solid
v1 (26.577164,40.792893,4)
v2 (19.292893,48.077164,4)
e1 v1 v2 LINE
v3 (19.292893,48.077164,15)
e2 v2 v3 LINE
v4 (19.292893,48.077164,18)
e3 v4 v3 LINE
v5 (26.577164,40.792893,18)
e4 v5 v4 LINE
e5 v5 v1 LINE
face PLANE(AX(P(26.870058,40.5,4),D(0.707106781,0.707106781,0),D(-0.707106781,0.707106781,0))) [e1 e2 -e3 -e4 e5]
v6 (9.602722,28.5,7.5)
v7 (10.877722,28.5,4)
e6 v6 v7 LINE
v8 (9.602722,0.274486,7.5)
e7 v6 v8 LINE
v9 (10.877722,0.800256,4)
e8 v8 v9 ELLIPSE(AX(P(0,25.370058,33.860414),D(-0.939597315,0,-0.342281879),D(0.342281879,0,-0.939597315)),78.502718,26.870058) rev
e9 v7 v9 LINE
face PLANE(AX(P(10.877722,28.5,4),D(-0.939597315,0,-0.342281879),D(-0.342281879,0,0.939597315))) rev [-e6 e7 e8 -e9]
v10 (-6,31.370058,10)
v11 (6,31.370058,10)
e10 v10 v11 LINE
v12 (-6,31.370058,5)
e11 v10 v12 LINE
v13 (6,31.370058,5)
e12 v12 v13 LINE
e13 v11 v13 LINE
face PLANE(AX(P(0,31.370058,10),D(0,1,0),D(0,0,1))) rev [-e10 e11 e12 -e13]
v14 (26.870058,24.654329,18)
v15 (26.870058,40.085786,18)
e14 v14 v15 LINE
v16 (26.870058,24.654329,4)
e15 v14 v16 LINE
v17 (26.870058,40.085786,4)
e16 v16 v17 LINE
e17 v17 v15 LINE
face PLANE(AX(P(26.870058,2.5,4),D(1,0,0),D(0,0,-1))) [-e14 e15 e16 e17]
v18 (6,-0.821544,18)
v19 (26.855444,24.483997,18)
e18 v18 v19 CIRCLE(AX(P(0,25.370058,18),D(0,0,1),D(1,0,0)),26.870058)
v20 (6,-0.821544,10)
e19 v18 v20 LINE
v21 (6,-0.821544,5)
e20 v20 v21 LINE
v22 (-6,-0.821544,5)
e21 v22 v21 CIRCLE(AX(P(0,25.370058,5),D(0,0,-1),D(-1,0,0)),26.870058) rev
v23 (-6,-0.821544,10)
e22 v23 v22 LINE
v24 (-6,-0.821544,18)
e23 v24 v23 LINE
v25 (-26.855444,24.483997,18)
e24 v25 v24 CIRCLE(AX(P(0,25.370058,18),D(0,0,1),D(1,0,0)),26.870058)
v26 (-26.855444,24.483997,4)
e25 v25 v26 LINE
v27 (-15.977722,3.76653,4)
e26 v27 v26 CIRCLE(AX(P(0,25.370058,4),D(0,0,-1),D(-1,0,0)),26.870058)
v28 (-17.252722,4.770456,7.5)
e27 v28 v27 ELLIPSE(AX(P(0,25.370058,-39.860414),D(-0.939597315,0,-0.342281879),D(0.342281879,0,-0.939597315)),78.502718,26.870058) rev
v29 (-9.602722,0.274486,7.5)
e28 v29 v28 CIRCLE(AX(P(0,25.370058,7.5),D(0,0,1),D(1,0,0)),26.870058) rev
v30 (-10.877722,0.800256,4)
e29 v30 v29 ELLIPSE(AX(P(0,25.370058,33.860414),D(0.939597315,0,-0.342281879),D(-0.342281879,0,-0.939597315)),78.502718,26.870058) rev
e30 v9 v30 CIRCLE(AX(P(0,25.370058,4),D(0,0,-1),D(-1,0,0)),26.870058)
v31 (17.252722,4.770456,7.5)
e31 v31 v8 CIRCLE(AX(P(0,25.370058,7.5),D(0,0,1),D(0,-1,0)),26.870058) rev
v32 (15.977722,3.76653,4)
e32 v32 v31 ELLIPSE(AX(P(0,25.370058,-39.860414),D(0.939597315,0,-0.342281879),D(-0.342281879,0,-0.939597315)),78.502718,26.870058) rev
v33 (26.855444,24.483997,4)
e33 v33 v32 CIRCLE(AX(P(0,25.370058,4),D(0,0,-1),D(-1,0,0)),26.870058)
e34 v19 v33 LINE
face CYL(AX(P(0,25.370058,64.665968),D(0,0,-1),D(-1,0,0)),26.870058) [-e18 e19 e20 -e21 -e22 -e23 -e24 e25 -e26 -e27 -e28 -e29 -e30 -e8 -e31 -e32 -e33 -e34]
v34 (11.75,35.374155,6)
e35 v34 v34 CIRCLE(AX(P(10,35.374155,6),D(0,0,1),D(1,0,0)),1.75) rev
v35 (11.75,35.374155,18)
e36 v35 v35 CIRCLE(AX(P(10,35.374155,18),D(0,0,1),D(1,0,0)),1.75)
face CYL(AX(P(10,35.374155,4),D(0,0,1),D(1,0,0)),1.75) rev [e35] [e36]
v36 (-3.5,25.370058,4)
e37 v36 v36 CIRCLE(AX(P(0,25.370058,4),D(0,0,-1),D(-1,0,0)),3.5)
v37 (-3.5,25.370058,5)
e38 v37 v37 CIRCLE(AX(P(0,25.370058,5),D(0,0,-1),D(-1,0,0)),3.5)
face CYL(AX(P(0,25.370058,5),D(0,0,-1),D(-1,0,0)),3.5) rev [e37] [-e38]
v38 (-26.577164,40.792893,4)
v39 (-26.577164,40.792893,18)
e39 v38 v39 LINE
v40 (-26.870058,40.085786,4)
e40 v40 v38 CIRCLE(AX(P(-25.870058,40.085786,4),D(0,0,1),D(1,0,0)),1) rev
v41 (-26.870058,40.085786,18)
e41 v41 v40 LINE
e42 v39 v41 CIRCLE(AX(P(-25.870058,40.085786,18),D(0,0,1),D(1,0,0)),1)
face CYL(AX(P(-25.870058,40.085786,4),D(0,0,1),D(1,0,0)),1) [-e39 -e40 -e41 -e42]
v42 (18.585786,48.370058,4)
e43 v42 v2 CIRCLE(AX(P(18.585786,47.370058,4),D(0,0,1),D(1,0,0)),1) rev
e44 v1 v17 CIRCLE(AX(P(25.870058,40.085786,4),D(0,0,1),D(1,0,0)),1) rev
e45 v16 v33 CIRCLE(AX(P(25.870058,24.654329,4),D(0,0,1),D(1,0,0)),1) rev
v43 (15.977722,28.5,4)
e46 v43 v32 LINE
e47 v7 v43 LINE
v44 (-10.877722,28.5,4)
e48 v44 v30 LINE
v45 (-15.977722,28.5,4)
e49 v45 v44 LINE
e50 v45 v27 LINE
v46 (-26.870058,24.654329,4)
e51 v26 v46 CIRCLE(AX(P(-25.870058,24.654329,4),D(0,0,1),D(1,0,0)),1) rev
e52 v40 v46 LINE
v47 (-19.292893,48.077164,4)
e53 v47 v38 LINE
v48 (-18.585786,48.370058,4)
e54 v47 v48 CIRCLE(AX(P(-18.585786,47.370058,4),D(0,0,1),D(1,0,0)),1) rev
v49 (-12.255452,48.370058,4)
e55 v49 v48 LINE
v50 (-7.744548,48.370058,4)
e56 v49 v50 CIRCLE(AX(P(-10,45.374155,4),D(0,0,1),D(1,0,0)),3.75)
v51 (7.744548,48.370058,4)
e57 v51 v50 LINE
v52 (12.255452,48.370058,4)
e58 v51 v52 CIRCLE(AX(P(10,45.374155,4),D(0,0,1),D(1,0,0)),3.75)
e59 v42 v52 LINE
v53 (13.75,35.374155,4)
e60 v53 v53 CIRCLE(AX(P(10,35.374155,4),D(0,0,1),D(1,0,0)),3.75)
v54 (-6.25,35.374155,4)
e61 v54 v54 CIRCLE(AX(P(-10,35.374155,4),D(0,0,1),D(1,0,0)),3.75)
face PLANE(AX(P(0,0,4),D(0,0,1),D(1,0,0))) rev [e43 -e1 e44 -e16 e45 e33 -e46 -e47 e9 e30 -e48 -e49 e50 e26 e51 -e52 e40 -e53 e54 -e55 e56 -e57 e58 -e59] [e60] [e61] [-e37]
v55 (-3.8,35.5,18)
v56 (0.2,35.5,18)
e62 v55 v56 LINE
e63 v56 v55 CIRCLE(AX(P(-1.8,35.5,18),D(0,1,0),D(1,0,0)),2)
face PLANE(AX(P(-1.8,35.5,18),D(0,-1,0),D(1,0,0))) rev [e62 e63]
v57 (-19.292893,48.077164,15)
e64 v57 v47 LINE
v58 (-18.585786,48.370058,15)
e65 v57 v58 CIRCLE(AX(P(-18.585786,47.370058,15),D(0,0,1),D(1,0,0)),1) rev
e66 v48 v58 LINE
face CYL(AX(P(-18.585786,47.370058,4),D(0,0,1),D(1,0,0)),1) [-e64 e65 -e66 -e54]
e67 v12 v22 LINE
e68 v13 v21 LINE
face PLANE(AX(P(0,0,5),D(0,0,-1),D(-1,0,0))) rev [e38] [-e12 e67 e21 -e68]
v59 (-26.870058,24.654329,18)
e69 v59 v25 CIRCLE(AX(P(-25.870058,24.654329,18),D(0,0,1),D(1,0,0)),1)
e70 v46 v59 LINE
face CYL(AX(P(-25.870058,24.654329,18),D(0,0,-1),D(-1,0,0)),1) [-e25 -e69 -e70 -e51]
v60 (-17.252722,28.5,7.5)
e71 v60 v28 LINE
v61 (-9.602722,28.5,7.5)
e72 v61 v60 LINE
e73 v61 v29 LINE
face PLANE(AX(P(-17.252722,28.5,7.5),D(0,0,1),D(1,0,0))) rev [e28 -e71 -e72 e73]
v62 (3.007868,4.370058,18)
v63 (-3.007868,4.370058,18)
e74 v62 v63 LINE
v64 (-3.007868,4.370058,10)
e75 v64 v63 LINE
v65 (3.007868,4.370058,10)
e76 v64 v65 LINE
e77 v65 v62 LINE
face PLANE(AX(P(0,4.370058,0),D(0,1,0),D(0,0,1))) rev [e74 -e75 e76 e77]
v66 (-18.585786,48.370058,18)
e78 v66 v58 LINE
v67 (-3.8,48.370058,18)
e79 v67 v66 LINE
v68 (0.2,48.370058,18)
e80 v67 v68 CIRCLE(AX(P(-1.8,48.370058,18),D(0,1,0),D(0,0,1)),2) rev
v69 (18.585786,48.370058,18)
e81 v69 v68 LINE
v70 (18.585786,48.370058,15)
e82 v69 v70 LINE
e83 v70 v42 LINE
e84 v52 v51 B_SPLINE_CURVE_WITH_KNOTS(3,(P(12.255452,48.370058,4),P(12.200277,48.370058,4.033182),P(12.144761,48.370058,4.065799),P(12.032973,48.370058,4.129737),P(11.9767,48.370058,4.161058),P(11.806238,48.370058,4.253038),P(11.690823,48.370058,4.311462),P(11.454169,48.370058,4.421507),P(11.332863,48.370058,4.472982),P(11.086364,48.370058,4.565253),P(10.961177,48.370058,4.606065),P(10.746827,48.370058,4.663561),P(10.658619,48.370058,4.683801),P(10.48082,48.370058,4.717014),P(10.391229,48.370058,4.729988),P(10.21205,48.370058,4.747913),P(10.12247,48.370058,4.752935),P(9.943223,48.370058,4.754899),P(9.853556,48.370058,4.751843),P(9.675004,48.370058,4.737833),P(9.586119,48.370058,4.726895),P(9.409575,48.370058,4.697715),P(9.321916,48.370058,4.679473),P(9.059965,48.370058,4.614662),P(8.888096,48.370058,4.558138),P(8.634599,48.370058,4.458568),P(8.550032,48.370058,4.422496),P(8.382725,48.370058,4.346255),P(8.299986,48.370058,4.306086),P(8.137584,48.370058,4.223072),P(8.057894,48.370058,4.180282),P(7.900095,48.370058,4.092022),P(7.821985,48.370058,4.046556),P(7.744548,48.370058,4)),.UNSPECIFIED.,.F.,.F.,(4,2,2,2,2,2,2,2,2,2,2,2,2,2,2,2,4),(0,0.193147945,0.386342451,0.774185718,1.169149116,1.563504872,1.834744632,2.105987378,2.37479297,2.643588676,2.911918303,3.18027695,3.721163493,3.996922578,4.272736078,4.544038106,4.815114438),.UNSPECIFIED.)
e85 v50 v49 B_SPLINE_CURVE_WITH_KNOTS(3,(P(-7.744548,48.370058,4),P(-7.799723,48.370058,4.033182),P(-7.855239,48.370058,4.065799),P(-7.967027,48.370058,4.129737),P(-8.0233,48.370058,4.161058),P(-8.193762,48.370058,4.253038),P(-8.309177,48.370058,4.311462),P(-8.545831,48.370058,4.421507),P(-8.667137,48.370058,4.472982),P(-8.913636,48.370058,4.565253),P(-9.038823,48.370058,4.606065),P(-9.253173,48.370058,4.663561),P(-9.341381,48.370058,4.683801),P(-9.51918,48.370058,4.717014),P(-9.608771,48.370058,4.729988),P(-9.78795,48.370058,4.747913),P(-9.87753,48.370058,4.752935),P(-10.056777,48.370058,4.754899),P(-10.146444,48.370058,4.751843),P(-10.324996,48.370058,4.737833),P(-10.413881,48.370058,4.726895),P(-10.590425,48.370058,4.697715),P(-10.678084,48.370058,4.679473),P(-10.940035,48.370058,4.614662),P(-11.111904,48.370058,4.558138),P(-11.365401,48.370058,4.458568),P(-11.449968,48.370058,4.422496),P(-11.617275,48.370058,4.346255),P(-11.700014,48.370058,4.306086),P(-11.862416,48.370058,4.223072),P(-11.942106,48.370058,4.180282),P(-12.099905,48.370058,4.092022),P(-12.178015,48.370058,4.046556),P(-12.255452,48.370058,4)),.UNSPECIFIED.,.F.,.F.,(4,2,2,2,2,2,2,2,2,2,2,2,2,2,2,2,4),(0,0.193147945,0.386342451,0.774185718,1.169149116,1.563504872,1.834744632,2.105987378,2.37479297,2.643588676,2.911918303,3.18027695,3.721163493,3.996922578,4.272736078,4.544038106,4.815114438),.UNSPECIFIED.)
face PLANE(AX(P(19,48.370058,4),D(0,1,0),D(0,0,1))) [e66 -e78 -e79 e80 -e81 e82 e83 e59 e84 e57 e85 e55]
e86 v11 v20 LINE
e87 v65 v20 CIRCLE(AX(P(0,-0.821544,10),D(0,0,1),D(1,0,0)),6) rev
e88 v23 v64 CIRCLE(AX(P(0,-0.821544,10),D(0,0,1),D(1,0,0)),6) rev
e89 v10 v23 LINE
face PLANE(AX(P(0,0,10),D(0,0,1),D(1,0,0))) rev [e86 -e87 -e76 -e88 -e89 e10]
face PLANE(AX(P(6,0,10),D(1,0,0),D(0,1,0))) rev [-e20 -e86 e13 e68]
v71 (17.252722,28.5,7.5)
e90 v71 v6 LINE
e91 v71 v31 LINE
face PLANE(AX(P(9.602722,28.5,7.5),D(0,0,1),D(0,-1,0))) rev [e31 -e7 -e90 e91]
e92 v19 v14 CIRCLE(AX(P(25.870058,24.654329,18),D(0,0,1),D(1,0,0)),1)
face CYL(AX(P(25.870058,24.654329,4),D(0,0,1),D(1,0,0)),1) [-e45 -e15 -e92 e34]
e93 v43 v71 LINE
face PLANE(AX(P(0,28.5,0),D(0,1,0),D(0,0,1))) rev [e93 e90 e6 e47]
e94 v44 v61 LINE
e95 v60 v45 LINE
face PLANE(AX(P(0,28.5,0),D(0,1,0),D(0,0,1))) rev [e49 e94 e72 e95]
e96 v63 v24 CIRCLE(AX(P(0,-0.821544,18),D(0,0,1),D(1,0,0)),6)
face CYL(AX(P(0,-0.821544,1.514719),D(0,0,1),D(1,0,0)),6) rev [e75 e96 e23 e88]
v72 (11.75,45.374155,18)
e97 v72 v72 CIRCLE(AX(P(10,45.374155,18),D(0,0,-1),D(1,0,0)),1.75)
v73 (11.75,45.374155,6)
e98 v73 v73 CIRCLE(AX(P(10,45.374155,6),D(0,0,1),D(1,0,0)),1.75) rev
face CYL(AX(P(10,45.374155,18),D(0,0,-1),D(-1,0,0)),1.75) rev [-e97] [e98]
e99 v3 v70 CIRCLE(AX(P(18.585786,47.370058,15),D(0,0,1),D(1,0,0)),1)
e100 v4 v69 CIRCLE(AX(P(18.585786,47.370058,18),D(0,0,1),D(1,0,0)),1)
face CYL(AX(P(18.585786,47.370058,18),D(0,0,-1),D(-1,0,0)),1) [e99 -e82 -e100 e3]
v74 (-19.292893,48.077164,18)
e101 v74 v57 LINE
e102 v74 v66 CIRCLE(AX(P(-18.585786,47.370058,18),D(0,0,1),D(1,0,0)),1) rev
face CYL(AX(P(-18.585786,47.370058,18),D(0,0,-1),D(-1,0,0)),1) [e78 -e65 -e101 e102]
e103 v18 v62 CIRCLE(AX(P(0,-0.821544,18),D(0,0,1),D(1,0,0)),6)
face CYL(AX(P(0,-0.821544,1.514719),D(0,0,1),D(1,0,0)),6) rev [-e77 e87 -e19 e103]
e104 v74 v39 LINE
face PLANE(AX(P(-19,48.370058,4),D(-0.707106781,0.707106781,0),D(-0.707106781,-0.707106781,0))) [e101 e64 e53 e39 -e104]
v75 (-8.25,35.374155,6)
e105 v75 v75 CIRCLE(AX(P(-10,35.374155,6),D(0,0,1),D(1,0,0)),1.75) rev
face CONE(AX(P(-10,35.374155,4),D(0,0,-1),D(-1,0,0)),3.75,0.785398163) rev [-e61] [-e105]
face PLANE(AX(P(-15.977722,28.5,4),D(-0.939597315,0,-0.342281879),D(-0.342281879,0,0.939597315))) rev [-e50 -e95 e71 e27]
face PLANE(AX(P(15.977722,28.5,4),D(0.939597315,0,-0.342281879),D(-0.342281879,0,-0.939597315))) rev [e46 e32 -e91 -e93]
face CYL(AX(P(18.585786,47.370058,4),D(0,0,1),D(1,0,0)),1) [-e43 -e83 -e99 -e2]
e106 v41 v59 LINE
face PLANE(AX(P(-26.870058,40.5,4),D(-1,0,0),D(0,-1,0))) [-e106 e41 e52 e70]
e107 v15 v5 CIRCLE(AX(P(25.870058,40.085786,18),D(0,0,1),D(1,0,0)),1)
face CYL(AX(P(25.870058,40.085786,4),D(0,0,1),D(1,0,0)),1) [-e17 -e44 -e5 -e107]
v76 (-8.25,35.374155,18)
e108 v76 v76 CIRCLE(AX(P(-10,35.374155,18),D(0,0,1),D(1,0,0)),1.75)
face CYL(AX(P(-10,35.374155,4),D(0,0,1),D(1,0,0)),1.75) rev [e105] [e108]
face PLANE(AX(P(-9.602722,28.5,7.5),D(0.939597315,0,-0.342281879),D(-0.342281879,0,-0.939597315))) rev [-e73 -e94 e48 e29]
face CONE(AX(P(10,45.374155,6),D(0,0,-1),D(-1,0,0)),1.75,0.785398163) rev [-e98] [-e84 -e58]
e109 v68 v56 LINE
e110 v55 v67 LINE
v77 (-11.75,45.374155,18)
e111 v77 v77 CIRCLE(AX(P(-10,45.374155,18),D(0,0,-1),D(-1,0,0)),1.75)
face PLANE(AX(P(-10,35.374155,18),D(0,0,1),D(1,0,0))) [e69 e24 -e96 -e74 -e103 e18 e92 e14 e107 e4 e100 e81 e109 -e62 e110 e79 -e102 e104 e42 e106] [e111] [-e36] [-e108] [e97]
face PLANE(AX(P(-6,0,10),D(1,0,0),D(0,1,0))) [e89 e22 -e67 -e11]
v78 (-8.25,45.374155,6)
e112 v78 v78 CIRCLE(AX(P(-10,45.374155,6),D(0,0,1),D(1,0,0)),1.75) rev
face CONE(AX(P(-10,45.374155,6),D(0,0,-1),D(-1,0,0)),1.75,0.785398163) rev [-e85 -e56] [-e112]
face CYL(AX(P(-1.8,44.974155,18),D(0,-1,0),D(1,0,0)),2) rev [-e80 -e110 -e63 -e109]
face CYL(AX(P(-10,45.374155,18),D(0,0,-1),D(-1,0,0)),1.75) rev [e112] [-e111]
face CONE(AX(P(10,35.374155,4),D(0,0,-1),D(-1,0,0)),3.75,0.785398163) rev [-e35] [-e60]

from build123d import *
from build123d.topology import SkipClean

# Parameters (mm, degrees)
CROQUIS3_W                   = 38
CROQUIS3_H                   = 38
SALIENTE_EXTRUIR9_DEPTH      = 1
SALIENTE_EXTRUIR10_START     = -11
SALIENTE_EXTRUIR10_OUTLINE_W = 38
SALIENTE_EXTRUIR10_OUTLINE_H = 38
SALIENTE_EXTRUIR10_DEPTH     = 10
CROQUIS13_W                  = 38
CROQUIS13_H                  = 38
SALIENTE_EXTRUIR15_DEPTH     = 3
CROQUIS14_R                  = 1.75
CORTAR_EXTRUIR1_DEPTH        = 14
CROQUIS15_W                  = 38
CROQUIS15_H                  = 24.129942315
CROQUIS15_R                  = 3.5
SALIENTE_EXTRUIR16_DEPTH     = 1
CORTAR_EXTRUIR2_DEPTH        = 14
SALIENTE_EXTRUIR17_DEPTH     = 5
SALIENTE_EXTRUIR18_DEPTH     = 5
CORTAR_EXTRUIR3_DEPTH        = 3
REDONDEO11_R                 = 1
CROQUIS21_R                  = 1.75
CORTAR_EXTRUIR4_DEPTH        = 11
SALIENTE_EXTRUIR20_START     = 3
CROQUIS22_R                  = 3
CROQUIS22_R_2                = 1.75
SALIENTE_EXTRUIR20_DEPTH     = 3
CHAFL_N1_SIZE                = 2
REDONDEO13_R                 = 1
SALIENTE_EXTRUIR22_DEPTH     = 3
REDONDEO14_R                 = 5
SALIENTE_EXTRUIR25_DEPTH     = 1
SALIENTE_EXTRUIR26_DEPTH     = 13
CROQUIS30_W                  = 12
CROQUIS30_H                  = 8
SALIENTE_EXTRUIR27_DEPTH     = 15
SALIENTE_EXTRUIR28_DEPTH     = 8
CORTAR_EXTRUIR5_DEPTH        = 30
CROQUIS35_R                  = 3
SALIENTE_EXTRUIR29_DEPTH     = 3
CORTAR_EXTRUIR6_DEPTH        = 5


# Read off the part's stored shape, not the designer's step: Saliente-Extruir10
with BuildPart() as part:
    # Croquis3 → Saliente-Extruir9 (new body)
    with BuildSketch(Plane.XY.offset(5)):
        Polygon((19, -5.370057685), (26.870057685, 2.5), (26.870057685, 40.5), (19, 48.370057685), (-19, 48.370057685), (-26.870057685, 40.5), (-26.870057685, 2.5), (-19, -5.370057685), align=None)
        with Locations((0, 21.5)):
            Rectangle(CROQUIS3_W, CROQUIS3_H, mode=Mode.SUBTRACT)
    extrude(amount=-SALIENTE_EXTRUIR9_DEPTH)

    # Saliente-Extruir10 outline → Saliente-Extruir10 (add)
    with BuildSketch(Plane(origin=(0, 0, 4), x_dir=(-1, 0, 0), z_dir=(0, 0, -1)).offset(SALIENTE_EXTRUIR10_START)):
        Polygon((-26.870057685, 2.5), (-19, -5.370057685), (19, -5.370057685), (26.870057685, 2.5), (26.870057685, 40.5), (19, 48.370057685), (-19, 48.370057685), (-26.870057685, 40.5), align=None)
        with Locations((0, 21.5)):
            Rectangle(SALIENTE_EXTRUIR10_OUTLINE_W, SALIENTE_EXTRUIR10_OUTLINE_H, mode=Mode.SUBTRACT)
    extrude(amount=SALIENTE_EXTRUIR10_DEPTH)

    # Croquis13 → Saliente-Extruir15 (add)
    with BuildSketch(Plane.XY.offset(15)):
        with BuildLine():
            Line((-22.5, 44.870057685), (-22.5, -1))
            Line((-22.5, -1), (22.5, -1))
            Line((22.5, -1), (22.5, 44.870057685))
            Line((22.5, 44.870057685), (19.292893219, 48.077164466))
            ThreePointArc((19.292893219, 48.077164466), (18.96846987, 48.293937218), (18.585786438, 48.370057685))
            Line((18.585786438, 48.370057685), (-18.585786438, 48.370057685))
            ThreePointArc((-18.585786438, 48.370057685), (-18.96846987, 48.293937218), (-19.292893219, 48.077164466))
            Line((-19.292893219, 48.077164466), (-22.5, 44.870057685))
        make_face()
        with Locations((0, 21.5)):
            Rectangle(CROQUIS13_W, CROQUIS13_H, mode=Mode.SUBTRACT)
    extrude(amount=SALIENTE_EXTRUIR15_DEPTH)

    # Croquis14 → Cortar-Extruir1 (cut)
    with BuildSketch(Plane(origin=(0, 0, 4), x_dir=(-1, 0, 0), z_dir=(0, 0, -1))):
        with Locations((10, 45.37415474)):
            Circle(CROQUIS14_R)
        with Locations(Location((-10, 45.37415474, 0), (0, 0, 180))):
            Circle(CROQUIS14_R)
    extrude(amount=-CORTAR_EXTRUIR1_DEPTH, mode=Mode.SUBTRACT)

    # Croquis15 → Saliente-Extruir16 (add)
    with BuildSketch(Plane(origin=(0, 0, 4), x_dir=(-1, 0, 0), z_dir=(0, 0, -1))):
        with Locations((0, 28.435028843)):
            Rectangle(CROQUIS15_W, CROQUIS15_H)
        with Locations((0, 25.370057685)):
            Circle(CROQUIS15_R, mode=Mode.SUBTRACT)
    extrude(amount=-SALIENTE_EXTRUIR16_DEPTH)

    # Croquis16 → Cortar-Extruir2 (cut)
    with BuildSketch(Plane(origin=(0, 0, 4), x_dir=(-1, 0, 0), z_dir=(0, 0, -1))):
        Polygon((-19, 2.5), (-19, 16.370057685), (-26.870057685, 24.24011537), (-26.870057685, 2.5), (-19, -5.370057685), (19, -5.370057685), (26.870057685, 2.5), (26.870057685, 24.24011537), (19, 16.370057685), (19, 2.5), align=None)
    extrude(amount=-CORTAR_EXTRUIR2_DEPTH, mode=Mode.SUBTRACT)

    # Croquis17 → Saliente-Extruir17 (add)
    with BuildSketch(Plane.XY.offset(5)):
        Polygon((6, 31.370057685), (6, 25.370057685), (6, 19.370057685), (6, 16.370057685), (19, 16.370057685), (19, 40.5), (-19, 40.5), (-19, 16.370057685), (-6, 16.370057685), (-6, 19.370057685), (-6, 31.370057685), align=None)
    extrude(amount=SALIENTE_EXTRUIR17_DEPTH)

    # Croquis18 → Saliente-Extruir18 (add)
    with BuildSketch(Plane.XY.offset(10)):
        Polygon((-19, 40.5), (-19, 16.370057685), (-6, 16.370057685), (-6, 19.370057685), (6, 19.370057685), (6, 16.370057685), (19, 16.370057685), (19, 40.5), align=None)
    extrude(amount=SALIENTE_EXTRUIR18_DEPTH)

    # Croquis19 → Cortar-Extruir3 (cut)
    with BuildSketch(Plane.XY.offset(18)):
        Polygon((-22.5, 19.870057685), (-19, 16.370057685), (-19, 21.370057685), (-22.5, 21.370057685), align=None)
        Polygon((19, 16.370057685), (22.5, 19.870057685), (22.5, 21.370057685), (19, 21.370057685), align=None)
    extrude(amount=-CORTAR_EXTRUIR3_DEPTH, mode=Mode.SUBTRACT)

    # Redondeo11
    redondeo11_edges = [part.edges().sort_by_distance(p)[0] for p in [
        (26.870057685, 40.5, 10),
        (19, 48.370057685, 10),
        (-19, 48.370057685, 10),
        (-26.870057685, 40.5, 10),
        (26.870057685, 24.24011537, 9.5),
        (19, 16.370057685, 9.5),
        (-26.870057685, 24.24011537, 9.5),
        (-19, 16.370057685, 9.5),
    ]]
    fillet(redondeo11_edges, radius=REDONDEO11_R)

    # Croquis21 → Cortar-Extruir4 (cut)
    with BuildSketch(Plane.XY.offset(15)):
        with Locations((-10, 35.37415474)):
            Circle(CROQUIS21_R)
        with Locations((10, 35.37415474)):
            Circle(CROQUIS21_R)
    extrude(amount=-CORTAR_EXTRUIR4_DEPTH, mode=Mode.SUBTRACT)

    # Croquis22 → Saliente-Extruir20 (add)
    # profile 1 of 2: a face of its own
    with BuildSketch(Plane.XY.offset(15).offset(SALIENTE_EXTRUIR20_START)):
        with Locations(Location((-10, 35.37415474, 0), (0, 0, 180))):
            Circle(CROQUIS22_R)
        with Locations((-10, 35.37415474)):
            Circle(CROQUIS22_R_2, mode=Mode.SUBTRACT)
    # profile 2 of 2: a face of its own
    with BuildSketch(Plane.XY.offset(15).offset(SALIENTE_EXTRUIR20_START)):
        with Locations(Location((10, 35.37415474, 0), (0, 0, 180))):
            Circle(CROQUIS22_R)
        with Locations((10, 35.37415474)):
            Circle(CROQUIS22_R_2, mode=Mode.SUBTRACT)
    extrude(amount=-SALIENTE_EXTRUIR20_DEPTH)

    # Croquis23 → Cortar-Revolución1 (revolve, cut)
    with BuildSketch(Plane.XY.offset(18)):
        Polygon((-1.8, 48.370057685), (-1.8, 44.97415474), (-1.8, 40.5), (0.2, 40.5), (0.2, 48.370057685), align=None)
    revolve(axis=Axis((-1.8, 44.97415474, 18), (0, 1, 0)), mode=Mode.SUBTRACT)

    # Chaflán1
    # the kernel refuses this chamfer: 2 mm, written as the material it takes off along each edge
    with BuildSketch(Plane(origin=(-10, 45.37415474, 4), x_dir=(-1, 0, 0), z_dir=(0, -1, 0))) as chafl_n1_piece_1:
        Polygon((1.75 + CHAFL_N1_SIZE, 0), (1.75, -CHAFL_N1_SIZE), (1.75, 0), align=None)
    revolve(axis=Axis((-10, 45.37415474, 4), (0, 0, -1)), mode=Mode.SUBTRACT)
    with BuildSketch(Plane(origin=(10, 45.37415474, 4), x_dir=(1, 0, 0), z_dir=(0, 1, 0))) as chafl_n1_piece_2:
        Polygon((1.75 + CHAFL_N1_SIZE, 0), (1.75, -CHAFL_N1_SIZE), (1.75, 0), align=None)
    revolve(axis=Axis((10, 45.37415474, 4), (0, 0, -1)), mode=Mode.SUBTRACT)
    with BuildSketch(Plane(origin=(-10, 35.37415474, 4), x_dir=(1, 0, 0), z_dir=(0, -1, 0))) as chafl_n1_piece_3:
        Polygon((1.75 + CHAFL_N1_SIZE, 0), (1.75, CHAFL_N1_SIZE), (1.75, 0), align=None)
    revolve(axis=Axis((-10, 35.37415474, 4), (0, 0, 1)), mode=Mode.SUBTRACT)
    with BuildSketch(Plane(origin=(10, 35.37415474, 4), x_dir=(1, 0, 0), z_dir=(0, -1, 0))) as chafl_n1_piece_4:
        Polygon((1.75 + CHAFL_N1_SIZE, 0), (1.75, CHAFL_N1_SIZE), (1.75, 0), align=None)
    revolve(axis=Axis((10, 35.37415474, 4), (0, 0, 1)), mode=Mode.SUBTRACT)

    # Redondeo13
    redondeo13_edges = [part.edges().sort_by_distance(p)[0] for p in [
        (22.5, 21.370057685, 16.5),
        (19, 21.370057685, 16.5),
        (-19, 21.370057685, 16.5),
        (-22.5, 21.370057685, 16.5),
    ]]
    fillet(redondeo13_edges, radius=REDONDEO13_R)

    # Croquis26 → Saliente-Extruir22 (add)
    with BuildSketch(Plane.XY.offset(15)):
        with BuildLine():
            Line((19, 22.370057685), (-19, 22.370057685))
            ThreePointArc((-19, 22.370057685), (-19.292893219, 21.662950904), (-20, 21.370057685))
            Line((-20, 21.370057685), (-21.5, 21.370057685))
            ThreePointArc((-21.5, 21.370057685), (-22.207106781, 21.662950904), (-22.5, 22.370057685))
            Line((-22.5, 22.370057685), (-22.5, 44.870057685))
            Line((-22.5, 44.870057685), (-26.577164466, 40.792893219))
            ThreePointArc((-26.577164466, 40.792893219), (-26.793937218, 40.46846987), (-26.870057685, 40.085786438))
            Line((-26.870057685, 40.085786438), (-26.870057685, 24.654328933))
            ThreePointArc((-26.870057685, 24.654328933), (-26.793937218, 24.2716455), (-26.577164466, 23.947222151))
            Line((-26.577164466, 23.947222151), (-19.292893219, 16.662950904))
            ThreePointArc((-19.292893219, 16.662950904), (-18.96846987, 16.446178153), (-18.585786438, 16.370057685))
            Line((-18.585786438, 16.370057685), (-6, 16.370057685))
            Line((-6, 16.370057685), (-6, 19.370057685))
            Line((-6, 19.370057685), (6, 19.370057685))
            Line((6, 19.370057685), (6, 16.370057685))
            Line((6, 16.370057685), (18.585786438, 16.370057685))
            ThreePointArc((18.585786438, 16.370057685), (18.96846987, 16.446178153), (19.292893219, 16.662950904))
            Line((19.292893219, 16.662950904), (26.577164466, 23.947222151))
            ThreePointArc((26.577164466, 23.947222151), (26.793937218, 24.2716455), (26.870057685, 24.654328933))
            Line((26.870057685, 24.654328933), (26.870057685, 40.085786438))
            ThreePointArc((26.870057685, 40.085786438), (26.793937218, 40.46846987), (26.577164466, 40.792893219))
            Line((26.577164466, 40.792893219), (22.5, 44.870057685))
            Line((22.5, 44.870057685), (22.5, 22.370057685))
            ThreePointArc((22.5, 22.370057685), (22.207106781, 21.662950904), (21.5, 21.370057685))
            Line((21.5, 21.370057685), (20, 21.370057685))
            ThreePointArc((20, 21.370057685), (19.292893219, 21.662950904), (19, 22.370057685))
        make_face()
    extrude(amount=SALIENTE_EXTRUIR22_DEPTH)

    # Redondeo14
    redondeo14_edges = [part.edges().sort_by_distance(p)[0] for p in [
        (-19, 40.5, 16.5),
        (19, 40.5, 16.5),
        (19, 22.370057685, 16.5),
        (-19, 22.370057685, 16.5),
    ]]
    fillet(redondeo14_edges, radius=REDONDEO14_R)

    # Croquis28 → Saliente-Extruir25 (add)
    with BuildSketch(Plane(origin=(0, 0, 4), x_dir=(-1, 0, 0), z_dir=(0, 0, -1))):
        with BuildLine():
            ThreePointArc((-26.855444452, 24.483997139), (0, -1.5), (26.855444452, 24.483997139))
            ThreePointArc((26.855444452, 24.483997139), (26.757844512, 24.194074057), (26.577164466, 23.947222151))
            Line((26.577164466, 23.947222151), (19.292893219, 16.662950904))
            ThreePointArc((19.292893219, 16.662950904), (18.96846987, 16.446178153), (18.585786438, 16.370057685))
            Line((18.585786438, 16.370057685), (-18.585786438, 16.370057685))
            ThreePointArc((-18.585786438, 16.370057685), (-18.96846987, 16.446178153), (-19.292893219, 16.662950904))
            Line((-19.292893219, 16.662950904), (-26.577164466, 23.947222151))
            ThreePointArc((-26.577164466, 23.947222151), (-26.757844512, 24.194074057), (-26.855444452, 24.483997139))
        make_face()
    extrude(amount=-SALIENTE_EXTRUIR25_DEPTH)

    # Croquis29 → Saliente-Extruir26 (add)
    with BuildSketch(Plane.XY.offset(5)):
        with BuildLine():
            Line((-6, 16.370057685), (-6, -0.821544022))
            ThreePointArc((-6, -0.821544022), (-20.735541008, 8.280957677), (-26.855444452, 24.483997139))
            Line((-26.855444452, 24.483997139), (-6, 16.370057685))
        make_face()
        with BuildLine():
            Line((6, 16.370057685), (6, -0.821544022))
            ThreePointArc((6, -0.821544022), (20.735541008, 8.280957677), (26.855444452, 24.483997139))
            Line((26.855444452, 24.483997139), (6, 16.370057685))
        make_face()
    extrude(amount=SALIENTE_EXTRUIR26_DEPTH)

    # Croquis30 → Saliente-Extruir27 (add)
    with BuildSketch(Plane.XZ.offset(-19.370057685)):
        with Locations((0, 14)):
            Rectangle(CROQUIS30_W, CROQUIS30_H)
    extrude(amount=SALIENTE_EXTRUIR27_DEPTH)

    # Croquis31 → Saliente-Extruir28 (add)
    with BuildSketch(Plane.XY.offset(18)):
        with BuildLine():
            ThreePointArc((-6, -0.821544022), (-4.242640687, 3.421096665), (0, 5.178455978))
            Line((0, 5.178455978), (-6, 5.178455978))
            Line((-6, 5.178455978), (-6, -0.821544022))
        make_face()
        with BuildLine():
            Line((6, 5.178455978), (0, 5.178455978))
            ThreePointArc((0, 5.178455978), (4.242640687, 3.421096665), (6, -0.821544022))
            Line((6, -0.821544022), (6, 5.178455978))
        make_face()
    extrude(amount=-SALIENTE_EXTRUIR28_DEPTH)

    # Croquis34 → Cortar-Extruir5 (cut)
    with BuildSketch(Plane(origin=(0, -1.5, 0), x_dir=(-1, 0, 0), z_dir=(0, -1, 0))):
        Polygon((9.602722226, -7.5), (10.877722226, -4), (15.977722226, -4), (17.252722226, -7.5), align=None)
        Polygon((-9.602722226, -7.5), (-17.252722226, -7.5), (-15.977722226, -4), (-10.877722226, -4), align=None)
    extrude(amount=-CORTAR_EXTRUIR5_DEPTH, mode=Mode.SUBTRACT)

    # Croquis35 → Saliente-Extruir29 (add)
    with BuildSketch(Plane.XY.offset(15)):
        with BuildLine():
            Line((-14, 40.5), (14, 40.5))
            ThreePointArc((14, 40.5), (17.535533906, 39.035533906), (19, 35.5))
            Line((19, 35.5), (19, 27.370057685))
            ThreePointArc((19, 27.370057685), (17.535533906, 23.834523779), (14, 22.370057685))
            Line((14, 22.370057685), (-14, 22.370057685))
            ThreePointArc((-14, 22.370057685), (-17.535533906, 23.834523779), (-19, 27.370057685))
            Line((-19, 27.370057685), (-19, 35.5))
            ThreePointArc((-19, 35.5), (-17.535533906, 39.035533906), (-14, 40.5))
        make_face()
        with Locations((-10, 35.37415474)):
            Circle(CROQUIS35_R, mode=Mode.SUBTRACT)
        with Locations((10, 35.37415474)):
            Circle(CROQUIS35_R, mode=Mode.SUBTRACT)
    extrude(amount=SALIENTE_EXTRUIR29_DEPTH)

    # Croquis36 → Cortar-Extruir6 (cut)
    with SkipClean():  # the faces are left unmerged after this step: merging them gives an invalid solid
        with BuildSketch(Plane(origin=(0, 40.5, 0), x_dir=(1, 0, 0), z_dir=(0, 1, 0))):
            with BuildLine():
                Line((0.2, -18), (-3.8, -18))
                ThreePointArc((-3.8, -18), (-1.8, -16), (0.2, -18))
            make_face()
        extrude(amount=-CORTAR_EXTRUIR6_DEPTH, mode=Mode.SUBTRACT)
    add(part.part.scale(1), mode=Mode.REPLACE)  # the faces are merged on a copy


solid = part.part
